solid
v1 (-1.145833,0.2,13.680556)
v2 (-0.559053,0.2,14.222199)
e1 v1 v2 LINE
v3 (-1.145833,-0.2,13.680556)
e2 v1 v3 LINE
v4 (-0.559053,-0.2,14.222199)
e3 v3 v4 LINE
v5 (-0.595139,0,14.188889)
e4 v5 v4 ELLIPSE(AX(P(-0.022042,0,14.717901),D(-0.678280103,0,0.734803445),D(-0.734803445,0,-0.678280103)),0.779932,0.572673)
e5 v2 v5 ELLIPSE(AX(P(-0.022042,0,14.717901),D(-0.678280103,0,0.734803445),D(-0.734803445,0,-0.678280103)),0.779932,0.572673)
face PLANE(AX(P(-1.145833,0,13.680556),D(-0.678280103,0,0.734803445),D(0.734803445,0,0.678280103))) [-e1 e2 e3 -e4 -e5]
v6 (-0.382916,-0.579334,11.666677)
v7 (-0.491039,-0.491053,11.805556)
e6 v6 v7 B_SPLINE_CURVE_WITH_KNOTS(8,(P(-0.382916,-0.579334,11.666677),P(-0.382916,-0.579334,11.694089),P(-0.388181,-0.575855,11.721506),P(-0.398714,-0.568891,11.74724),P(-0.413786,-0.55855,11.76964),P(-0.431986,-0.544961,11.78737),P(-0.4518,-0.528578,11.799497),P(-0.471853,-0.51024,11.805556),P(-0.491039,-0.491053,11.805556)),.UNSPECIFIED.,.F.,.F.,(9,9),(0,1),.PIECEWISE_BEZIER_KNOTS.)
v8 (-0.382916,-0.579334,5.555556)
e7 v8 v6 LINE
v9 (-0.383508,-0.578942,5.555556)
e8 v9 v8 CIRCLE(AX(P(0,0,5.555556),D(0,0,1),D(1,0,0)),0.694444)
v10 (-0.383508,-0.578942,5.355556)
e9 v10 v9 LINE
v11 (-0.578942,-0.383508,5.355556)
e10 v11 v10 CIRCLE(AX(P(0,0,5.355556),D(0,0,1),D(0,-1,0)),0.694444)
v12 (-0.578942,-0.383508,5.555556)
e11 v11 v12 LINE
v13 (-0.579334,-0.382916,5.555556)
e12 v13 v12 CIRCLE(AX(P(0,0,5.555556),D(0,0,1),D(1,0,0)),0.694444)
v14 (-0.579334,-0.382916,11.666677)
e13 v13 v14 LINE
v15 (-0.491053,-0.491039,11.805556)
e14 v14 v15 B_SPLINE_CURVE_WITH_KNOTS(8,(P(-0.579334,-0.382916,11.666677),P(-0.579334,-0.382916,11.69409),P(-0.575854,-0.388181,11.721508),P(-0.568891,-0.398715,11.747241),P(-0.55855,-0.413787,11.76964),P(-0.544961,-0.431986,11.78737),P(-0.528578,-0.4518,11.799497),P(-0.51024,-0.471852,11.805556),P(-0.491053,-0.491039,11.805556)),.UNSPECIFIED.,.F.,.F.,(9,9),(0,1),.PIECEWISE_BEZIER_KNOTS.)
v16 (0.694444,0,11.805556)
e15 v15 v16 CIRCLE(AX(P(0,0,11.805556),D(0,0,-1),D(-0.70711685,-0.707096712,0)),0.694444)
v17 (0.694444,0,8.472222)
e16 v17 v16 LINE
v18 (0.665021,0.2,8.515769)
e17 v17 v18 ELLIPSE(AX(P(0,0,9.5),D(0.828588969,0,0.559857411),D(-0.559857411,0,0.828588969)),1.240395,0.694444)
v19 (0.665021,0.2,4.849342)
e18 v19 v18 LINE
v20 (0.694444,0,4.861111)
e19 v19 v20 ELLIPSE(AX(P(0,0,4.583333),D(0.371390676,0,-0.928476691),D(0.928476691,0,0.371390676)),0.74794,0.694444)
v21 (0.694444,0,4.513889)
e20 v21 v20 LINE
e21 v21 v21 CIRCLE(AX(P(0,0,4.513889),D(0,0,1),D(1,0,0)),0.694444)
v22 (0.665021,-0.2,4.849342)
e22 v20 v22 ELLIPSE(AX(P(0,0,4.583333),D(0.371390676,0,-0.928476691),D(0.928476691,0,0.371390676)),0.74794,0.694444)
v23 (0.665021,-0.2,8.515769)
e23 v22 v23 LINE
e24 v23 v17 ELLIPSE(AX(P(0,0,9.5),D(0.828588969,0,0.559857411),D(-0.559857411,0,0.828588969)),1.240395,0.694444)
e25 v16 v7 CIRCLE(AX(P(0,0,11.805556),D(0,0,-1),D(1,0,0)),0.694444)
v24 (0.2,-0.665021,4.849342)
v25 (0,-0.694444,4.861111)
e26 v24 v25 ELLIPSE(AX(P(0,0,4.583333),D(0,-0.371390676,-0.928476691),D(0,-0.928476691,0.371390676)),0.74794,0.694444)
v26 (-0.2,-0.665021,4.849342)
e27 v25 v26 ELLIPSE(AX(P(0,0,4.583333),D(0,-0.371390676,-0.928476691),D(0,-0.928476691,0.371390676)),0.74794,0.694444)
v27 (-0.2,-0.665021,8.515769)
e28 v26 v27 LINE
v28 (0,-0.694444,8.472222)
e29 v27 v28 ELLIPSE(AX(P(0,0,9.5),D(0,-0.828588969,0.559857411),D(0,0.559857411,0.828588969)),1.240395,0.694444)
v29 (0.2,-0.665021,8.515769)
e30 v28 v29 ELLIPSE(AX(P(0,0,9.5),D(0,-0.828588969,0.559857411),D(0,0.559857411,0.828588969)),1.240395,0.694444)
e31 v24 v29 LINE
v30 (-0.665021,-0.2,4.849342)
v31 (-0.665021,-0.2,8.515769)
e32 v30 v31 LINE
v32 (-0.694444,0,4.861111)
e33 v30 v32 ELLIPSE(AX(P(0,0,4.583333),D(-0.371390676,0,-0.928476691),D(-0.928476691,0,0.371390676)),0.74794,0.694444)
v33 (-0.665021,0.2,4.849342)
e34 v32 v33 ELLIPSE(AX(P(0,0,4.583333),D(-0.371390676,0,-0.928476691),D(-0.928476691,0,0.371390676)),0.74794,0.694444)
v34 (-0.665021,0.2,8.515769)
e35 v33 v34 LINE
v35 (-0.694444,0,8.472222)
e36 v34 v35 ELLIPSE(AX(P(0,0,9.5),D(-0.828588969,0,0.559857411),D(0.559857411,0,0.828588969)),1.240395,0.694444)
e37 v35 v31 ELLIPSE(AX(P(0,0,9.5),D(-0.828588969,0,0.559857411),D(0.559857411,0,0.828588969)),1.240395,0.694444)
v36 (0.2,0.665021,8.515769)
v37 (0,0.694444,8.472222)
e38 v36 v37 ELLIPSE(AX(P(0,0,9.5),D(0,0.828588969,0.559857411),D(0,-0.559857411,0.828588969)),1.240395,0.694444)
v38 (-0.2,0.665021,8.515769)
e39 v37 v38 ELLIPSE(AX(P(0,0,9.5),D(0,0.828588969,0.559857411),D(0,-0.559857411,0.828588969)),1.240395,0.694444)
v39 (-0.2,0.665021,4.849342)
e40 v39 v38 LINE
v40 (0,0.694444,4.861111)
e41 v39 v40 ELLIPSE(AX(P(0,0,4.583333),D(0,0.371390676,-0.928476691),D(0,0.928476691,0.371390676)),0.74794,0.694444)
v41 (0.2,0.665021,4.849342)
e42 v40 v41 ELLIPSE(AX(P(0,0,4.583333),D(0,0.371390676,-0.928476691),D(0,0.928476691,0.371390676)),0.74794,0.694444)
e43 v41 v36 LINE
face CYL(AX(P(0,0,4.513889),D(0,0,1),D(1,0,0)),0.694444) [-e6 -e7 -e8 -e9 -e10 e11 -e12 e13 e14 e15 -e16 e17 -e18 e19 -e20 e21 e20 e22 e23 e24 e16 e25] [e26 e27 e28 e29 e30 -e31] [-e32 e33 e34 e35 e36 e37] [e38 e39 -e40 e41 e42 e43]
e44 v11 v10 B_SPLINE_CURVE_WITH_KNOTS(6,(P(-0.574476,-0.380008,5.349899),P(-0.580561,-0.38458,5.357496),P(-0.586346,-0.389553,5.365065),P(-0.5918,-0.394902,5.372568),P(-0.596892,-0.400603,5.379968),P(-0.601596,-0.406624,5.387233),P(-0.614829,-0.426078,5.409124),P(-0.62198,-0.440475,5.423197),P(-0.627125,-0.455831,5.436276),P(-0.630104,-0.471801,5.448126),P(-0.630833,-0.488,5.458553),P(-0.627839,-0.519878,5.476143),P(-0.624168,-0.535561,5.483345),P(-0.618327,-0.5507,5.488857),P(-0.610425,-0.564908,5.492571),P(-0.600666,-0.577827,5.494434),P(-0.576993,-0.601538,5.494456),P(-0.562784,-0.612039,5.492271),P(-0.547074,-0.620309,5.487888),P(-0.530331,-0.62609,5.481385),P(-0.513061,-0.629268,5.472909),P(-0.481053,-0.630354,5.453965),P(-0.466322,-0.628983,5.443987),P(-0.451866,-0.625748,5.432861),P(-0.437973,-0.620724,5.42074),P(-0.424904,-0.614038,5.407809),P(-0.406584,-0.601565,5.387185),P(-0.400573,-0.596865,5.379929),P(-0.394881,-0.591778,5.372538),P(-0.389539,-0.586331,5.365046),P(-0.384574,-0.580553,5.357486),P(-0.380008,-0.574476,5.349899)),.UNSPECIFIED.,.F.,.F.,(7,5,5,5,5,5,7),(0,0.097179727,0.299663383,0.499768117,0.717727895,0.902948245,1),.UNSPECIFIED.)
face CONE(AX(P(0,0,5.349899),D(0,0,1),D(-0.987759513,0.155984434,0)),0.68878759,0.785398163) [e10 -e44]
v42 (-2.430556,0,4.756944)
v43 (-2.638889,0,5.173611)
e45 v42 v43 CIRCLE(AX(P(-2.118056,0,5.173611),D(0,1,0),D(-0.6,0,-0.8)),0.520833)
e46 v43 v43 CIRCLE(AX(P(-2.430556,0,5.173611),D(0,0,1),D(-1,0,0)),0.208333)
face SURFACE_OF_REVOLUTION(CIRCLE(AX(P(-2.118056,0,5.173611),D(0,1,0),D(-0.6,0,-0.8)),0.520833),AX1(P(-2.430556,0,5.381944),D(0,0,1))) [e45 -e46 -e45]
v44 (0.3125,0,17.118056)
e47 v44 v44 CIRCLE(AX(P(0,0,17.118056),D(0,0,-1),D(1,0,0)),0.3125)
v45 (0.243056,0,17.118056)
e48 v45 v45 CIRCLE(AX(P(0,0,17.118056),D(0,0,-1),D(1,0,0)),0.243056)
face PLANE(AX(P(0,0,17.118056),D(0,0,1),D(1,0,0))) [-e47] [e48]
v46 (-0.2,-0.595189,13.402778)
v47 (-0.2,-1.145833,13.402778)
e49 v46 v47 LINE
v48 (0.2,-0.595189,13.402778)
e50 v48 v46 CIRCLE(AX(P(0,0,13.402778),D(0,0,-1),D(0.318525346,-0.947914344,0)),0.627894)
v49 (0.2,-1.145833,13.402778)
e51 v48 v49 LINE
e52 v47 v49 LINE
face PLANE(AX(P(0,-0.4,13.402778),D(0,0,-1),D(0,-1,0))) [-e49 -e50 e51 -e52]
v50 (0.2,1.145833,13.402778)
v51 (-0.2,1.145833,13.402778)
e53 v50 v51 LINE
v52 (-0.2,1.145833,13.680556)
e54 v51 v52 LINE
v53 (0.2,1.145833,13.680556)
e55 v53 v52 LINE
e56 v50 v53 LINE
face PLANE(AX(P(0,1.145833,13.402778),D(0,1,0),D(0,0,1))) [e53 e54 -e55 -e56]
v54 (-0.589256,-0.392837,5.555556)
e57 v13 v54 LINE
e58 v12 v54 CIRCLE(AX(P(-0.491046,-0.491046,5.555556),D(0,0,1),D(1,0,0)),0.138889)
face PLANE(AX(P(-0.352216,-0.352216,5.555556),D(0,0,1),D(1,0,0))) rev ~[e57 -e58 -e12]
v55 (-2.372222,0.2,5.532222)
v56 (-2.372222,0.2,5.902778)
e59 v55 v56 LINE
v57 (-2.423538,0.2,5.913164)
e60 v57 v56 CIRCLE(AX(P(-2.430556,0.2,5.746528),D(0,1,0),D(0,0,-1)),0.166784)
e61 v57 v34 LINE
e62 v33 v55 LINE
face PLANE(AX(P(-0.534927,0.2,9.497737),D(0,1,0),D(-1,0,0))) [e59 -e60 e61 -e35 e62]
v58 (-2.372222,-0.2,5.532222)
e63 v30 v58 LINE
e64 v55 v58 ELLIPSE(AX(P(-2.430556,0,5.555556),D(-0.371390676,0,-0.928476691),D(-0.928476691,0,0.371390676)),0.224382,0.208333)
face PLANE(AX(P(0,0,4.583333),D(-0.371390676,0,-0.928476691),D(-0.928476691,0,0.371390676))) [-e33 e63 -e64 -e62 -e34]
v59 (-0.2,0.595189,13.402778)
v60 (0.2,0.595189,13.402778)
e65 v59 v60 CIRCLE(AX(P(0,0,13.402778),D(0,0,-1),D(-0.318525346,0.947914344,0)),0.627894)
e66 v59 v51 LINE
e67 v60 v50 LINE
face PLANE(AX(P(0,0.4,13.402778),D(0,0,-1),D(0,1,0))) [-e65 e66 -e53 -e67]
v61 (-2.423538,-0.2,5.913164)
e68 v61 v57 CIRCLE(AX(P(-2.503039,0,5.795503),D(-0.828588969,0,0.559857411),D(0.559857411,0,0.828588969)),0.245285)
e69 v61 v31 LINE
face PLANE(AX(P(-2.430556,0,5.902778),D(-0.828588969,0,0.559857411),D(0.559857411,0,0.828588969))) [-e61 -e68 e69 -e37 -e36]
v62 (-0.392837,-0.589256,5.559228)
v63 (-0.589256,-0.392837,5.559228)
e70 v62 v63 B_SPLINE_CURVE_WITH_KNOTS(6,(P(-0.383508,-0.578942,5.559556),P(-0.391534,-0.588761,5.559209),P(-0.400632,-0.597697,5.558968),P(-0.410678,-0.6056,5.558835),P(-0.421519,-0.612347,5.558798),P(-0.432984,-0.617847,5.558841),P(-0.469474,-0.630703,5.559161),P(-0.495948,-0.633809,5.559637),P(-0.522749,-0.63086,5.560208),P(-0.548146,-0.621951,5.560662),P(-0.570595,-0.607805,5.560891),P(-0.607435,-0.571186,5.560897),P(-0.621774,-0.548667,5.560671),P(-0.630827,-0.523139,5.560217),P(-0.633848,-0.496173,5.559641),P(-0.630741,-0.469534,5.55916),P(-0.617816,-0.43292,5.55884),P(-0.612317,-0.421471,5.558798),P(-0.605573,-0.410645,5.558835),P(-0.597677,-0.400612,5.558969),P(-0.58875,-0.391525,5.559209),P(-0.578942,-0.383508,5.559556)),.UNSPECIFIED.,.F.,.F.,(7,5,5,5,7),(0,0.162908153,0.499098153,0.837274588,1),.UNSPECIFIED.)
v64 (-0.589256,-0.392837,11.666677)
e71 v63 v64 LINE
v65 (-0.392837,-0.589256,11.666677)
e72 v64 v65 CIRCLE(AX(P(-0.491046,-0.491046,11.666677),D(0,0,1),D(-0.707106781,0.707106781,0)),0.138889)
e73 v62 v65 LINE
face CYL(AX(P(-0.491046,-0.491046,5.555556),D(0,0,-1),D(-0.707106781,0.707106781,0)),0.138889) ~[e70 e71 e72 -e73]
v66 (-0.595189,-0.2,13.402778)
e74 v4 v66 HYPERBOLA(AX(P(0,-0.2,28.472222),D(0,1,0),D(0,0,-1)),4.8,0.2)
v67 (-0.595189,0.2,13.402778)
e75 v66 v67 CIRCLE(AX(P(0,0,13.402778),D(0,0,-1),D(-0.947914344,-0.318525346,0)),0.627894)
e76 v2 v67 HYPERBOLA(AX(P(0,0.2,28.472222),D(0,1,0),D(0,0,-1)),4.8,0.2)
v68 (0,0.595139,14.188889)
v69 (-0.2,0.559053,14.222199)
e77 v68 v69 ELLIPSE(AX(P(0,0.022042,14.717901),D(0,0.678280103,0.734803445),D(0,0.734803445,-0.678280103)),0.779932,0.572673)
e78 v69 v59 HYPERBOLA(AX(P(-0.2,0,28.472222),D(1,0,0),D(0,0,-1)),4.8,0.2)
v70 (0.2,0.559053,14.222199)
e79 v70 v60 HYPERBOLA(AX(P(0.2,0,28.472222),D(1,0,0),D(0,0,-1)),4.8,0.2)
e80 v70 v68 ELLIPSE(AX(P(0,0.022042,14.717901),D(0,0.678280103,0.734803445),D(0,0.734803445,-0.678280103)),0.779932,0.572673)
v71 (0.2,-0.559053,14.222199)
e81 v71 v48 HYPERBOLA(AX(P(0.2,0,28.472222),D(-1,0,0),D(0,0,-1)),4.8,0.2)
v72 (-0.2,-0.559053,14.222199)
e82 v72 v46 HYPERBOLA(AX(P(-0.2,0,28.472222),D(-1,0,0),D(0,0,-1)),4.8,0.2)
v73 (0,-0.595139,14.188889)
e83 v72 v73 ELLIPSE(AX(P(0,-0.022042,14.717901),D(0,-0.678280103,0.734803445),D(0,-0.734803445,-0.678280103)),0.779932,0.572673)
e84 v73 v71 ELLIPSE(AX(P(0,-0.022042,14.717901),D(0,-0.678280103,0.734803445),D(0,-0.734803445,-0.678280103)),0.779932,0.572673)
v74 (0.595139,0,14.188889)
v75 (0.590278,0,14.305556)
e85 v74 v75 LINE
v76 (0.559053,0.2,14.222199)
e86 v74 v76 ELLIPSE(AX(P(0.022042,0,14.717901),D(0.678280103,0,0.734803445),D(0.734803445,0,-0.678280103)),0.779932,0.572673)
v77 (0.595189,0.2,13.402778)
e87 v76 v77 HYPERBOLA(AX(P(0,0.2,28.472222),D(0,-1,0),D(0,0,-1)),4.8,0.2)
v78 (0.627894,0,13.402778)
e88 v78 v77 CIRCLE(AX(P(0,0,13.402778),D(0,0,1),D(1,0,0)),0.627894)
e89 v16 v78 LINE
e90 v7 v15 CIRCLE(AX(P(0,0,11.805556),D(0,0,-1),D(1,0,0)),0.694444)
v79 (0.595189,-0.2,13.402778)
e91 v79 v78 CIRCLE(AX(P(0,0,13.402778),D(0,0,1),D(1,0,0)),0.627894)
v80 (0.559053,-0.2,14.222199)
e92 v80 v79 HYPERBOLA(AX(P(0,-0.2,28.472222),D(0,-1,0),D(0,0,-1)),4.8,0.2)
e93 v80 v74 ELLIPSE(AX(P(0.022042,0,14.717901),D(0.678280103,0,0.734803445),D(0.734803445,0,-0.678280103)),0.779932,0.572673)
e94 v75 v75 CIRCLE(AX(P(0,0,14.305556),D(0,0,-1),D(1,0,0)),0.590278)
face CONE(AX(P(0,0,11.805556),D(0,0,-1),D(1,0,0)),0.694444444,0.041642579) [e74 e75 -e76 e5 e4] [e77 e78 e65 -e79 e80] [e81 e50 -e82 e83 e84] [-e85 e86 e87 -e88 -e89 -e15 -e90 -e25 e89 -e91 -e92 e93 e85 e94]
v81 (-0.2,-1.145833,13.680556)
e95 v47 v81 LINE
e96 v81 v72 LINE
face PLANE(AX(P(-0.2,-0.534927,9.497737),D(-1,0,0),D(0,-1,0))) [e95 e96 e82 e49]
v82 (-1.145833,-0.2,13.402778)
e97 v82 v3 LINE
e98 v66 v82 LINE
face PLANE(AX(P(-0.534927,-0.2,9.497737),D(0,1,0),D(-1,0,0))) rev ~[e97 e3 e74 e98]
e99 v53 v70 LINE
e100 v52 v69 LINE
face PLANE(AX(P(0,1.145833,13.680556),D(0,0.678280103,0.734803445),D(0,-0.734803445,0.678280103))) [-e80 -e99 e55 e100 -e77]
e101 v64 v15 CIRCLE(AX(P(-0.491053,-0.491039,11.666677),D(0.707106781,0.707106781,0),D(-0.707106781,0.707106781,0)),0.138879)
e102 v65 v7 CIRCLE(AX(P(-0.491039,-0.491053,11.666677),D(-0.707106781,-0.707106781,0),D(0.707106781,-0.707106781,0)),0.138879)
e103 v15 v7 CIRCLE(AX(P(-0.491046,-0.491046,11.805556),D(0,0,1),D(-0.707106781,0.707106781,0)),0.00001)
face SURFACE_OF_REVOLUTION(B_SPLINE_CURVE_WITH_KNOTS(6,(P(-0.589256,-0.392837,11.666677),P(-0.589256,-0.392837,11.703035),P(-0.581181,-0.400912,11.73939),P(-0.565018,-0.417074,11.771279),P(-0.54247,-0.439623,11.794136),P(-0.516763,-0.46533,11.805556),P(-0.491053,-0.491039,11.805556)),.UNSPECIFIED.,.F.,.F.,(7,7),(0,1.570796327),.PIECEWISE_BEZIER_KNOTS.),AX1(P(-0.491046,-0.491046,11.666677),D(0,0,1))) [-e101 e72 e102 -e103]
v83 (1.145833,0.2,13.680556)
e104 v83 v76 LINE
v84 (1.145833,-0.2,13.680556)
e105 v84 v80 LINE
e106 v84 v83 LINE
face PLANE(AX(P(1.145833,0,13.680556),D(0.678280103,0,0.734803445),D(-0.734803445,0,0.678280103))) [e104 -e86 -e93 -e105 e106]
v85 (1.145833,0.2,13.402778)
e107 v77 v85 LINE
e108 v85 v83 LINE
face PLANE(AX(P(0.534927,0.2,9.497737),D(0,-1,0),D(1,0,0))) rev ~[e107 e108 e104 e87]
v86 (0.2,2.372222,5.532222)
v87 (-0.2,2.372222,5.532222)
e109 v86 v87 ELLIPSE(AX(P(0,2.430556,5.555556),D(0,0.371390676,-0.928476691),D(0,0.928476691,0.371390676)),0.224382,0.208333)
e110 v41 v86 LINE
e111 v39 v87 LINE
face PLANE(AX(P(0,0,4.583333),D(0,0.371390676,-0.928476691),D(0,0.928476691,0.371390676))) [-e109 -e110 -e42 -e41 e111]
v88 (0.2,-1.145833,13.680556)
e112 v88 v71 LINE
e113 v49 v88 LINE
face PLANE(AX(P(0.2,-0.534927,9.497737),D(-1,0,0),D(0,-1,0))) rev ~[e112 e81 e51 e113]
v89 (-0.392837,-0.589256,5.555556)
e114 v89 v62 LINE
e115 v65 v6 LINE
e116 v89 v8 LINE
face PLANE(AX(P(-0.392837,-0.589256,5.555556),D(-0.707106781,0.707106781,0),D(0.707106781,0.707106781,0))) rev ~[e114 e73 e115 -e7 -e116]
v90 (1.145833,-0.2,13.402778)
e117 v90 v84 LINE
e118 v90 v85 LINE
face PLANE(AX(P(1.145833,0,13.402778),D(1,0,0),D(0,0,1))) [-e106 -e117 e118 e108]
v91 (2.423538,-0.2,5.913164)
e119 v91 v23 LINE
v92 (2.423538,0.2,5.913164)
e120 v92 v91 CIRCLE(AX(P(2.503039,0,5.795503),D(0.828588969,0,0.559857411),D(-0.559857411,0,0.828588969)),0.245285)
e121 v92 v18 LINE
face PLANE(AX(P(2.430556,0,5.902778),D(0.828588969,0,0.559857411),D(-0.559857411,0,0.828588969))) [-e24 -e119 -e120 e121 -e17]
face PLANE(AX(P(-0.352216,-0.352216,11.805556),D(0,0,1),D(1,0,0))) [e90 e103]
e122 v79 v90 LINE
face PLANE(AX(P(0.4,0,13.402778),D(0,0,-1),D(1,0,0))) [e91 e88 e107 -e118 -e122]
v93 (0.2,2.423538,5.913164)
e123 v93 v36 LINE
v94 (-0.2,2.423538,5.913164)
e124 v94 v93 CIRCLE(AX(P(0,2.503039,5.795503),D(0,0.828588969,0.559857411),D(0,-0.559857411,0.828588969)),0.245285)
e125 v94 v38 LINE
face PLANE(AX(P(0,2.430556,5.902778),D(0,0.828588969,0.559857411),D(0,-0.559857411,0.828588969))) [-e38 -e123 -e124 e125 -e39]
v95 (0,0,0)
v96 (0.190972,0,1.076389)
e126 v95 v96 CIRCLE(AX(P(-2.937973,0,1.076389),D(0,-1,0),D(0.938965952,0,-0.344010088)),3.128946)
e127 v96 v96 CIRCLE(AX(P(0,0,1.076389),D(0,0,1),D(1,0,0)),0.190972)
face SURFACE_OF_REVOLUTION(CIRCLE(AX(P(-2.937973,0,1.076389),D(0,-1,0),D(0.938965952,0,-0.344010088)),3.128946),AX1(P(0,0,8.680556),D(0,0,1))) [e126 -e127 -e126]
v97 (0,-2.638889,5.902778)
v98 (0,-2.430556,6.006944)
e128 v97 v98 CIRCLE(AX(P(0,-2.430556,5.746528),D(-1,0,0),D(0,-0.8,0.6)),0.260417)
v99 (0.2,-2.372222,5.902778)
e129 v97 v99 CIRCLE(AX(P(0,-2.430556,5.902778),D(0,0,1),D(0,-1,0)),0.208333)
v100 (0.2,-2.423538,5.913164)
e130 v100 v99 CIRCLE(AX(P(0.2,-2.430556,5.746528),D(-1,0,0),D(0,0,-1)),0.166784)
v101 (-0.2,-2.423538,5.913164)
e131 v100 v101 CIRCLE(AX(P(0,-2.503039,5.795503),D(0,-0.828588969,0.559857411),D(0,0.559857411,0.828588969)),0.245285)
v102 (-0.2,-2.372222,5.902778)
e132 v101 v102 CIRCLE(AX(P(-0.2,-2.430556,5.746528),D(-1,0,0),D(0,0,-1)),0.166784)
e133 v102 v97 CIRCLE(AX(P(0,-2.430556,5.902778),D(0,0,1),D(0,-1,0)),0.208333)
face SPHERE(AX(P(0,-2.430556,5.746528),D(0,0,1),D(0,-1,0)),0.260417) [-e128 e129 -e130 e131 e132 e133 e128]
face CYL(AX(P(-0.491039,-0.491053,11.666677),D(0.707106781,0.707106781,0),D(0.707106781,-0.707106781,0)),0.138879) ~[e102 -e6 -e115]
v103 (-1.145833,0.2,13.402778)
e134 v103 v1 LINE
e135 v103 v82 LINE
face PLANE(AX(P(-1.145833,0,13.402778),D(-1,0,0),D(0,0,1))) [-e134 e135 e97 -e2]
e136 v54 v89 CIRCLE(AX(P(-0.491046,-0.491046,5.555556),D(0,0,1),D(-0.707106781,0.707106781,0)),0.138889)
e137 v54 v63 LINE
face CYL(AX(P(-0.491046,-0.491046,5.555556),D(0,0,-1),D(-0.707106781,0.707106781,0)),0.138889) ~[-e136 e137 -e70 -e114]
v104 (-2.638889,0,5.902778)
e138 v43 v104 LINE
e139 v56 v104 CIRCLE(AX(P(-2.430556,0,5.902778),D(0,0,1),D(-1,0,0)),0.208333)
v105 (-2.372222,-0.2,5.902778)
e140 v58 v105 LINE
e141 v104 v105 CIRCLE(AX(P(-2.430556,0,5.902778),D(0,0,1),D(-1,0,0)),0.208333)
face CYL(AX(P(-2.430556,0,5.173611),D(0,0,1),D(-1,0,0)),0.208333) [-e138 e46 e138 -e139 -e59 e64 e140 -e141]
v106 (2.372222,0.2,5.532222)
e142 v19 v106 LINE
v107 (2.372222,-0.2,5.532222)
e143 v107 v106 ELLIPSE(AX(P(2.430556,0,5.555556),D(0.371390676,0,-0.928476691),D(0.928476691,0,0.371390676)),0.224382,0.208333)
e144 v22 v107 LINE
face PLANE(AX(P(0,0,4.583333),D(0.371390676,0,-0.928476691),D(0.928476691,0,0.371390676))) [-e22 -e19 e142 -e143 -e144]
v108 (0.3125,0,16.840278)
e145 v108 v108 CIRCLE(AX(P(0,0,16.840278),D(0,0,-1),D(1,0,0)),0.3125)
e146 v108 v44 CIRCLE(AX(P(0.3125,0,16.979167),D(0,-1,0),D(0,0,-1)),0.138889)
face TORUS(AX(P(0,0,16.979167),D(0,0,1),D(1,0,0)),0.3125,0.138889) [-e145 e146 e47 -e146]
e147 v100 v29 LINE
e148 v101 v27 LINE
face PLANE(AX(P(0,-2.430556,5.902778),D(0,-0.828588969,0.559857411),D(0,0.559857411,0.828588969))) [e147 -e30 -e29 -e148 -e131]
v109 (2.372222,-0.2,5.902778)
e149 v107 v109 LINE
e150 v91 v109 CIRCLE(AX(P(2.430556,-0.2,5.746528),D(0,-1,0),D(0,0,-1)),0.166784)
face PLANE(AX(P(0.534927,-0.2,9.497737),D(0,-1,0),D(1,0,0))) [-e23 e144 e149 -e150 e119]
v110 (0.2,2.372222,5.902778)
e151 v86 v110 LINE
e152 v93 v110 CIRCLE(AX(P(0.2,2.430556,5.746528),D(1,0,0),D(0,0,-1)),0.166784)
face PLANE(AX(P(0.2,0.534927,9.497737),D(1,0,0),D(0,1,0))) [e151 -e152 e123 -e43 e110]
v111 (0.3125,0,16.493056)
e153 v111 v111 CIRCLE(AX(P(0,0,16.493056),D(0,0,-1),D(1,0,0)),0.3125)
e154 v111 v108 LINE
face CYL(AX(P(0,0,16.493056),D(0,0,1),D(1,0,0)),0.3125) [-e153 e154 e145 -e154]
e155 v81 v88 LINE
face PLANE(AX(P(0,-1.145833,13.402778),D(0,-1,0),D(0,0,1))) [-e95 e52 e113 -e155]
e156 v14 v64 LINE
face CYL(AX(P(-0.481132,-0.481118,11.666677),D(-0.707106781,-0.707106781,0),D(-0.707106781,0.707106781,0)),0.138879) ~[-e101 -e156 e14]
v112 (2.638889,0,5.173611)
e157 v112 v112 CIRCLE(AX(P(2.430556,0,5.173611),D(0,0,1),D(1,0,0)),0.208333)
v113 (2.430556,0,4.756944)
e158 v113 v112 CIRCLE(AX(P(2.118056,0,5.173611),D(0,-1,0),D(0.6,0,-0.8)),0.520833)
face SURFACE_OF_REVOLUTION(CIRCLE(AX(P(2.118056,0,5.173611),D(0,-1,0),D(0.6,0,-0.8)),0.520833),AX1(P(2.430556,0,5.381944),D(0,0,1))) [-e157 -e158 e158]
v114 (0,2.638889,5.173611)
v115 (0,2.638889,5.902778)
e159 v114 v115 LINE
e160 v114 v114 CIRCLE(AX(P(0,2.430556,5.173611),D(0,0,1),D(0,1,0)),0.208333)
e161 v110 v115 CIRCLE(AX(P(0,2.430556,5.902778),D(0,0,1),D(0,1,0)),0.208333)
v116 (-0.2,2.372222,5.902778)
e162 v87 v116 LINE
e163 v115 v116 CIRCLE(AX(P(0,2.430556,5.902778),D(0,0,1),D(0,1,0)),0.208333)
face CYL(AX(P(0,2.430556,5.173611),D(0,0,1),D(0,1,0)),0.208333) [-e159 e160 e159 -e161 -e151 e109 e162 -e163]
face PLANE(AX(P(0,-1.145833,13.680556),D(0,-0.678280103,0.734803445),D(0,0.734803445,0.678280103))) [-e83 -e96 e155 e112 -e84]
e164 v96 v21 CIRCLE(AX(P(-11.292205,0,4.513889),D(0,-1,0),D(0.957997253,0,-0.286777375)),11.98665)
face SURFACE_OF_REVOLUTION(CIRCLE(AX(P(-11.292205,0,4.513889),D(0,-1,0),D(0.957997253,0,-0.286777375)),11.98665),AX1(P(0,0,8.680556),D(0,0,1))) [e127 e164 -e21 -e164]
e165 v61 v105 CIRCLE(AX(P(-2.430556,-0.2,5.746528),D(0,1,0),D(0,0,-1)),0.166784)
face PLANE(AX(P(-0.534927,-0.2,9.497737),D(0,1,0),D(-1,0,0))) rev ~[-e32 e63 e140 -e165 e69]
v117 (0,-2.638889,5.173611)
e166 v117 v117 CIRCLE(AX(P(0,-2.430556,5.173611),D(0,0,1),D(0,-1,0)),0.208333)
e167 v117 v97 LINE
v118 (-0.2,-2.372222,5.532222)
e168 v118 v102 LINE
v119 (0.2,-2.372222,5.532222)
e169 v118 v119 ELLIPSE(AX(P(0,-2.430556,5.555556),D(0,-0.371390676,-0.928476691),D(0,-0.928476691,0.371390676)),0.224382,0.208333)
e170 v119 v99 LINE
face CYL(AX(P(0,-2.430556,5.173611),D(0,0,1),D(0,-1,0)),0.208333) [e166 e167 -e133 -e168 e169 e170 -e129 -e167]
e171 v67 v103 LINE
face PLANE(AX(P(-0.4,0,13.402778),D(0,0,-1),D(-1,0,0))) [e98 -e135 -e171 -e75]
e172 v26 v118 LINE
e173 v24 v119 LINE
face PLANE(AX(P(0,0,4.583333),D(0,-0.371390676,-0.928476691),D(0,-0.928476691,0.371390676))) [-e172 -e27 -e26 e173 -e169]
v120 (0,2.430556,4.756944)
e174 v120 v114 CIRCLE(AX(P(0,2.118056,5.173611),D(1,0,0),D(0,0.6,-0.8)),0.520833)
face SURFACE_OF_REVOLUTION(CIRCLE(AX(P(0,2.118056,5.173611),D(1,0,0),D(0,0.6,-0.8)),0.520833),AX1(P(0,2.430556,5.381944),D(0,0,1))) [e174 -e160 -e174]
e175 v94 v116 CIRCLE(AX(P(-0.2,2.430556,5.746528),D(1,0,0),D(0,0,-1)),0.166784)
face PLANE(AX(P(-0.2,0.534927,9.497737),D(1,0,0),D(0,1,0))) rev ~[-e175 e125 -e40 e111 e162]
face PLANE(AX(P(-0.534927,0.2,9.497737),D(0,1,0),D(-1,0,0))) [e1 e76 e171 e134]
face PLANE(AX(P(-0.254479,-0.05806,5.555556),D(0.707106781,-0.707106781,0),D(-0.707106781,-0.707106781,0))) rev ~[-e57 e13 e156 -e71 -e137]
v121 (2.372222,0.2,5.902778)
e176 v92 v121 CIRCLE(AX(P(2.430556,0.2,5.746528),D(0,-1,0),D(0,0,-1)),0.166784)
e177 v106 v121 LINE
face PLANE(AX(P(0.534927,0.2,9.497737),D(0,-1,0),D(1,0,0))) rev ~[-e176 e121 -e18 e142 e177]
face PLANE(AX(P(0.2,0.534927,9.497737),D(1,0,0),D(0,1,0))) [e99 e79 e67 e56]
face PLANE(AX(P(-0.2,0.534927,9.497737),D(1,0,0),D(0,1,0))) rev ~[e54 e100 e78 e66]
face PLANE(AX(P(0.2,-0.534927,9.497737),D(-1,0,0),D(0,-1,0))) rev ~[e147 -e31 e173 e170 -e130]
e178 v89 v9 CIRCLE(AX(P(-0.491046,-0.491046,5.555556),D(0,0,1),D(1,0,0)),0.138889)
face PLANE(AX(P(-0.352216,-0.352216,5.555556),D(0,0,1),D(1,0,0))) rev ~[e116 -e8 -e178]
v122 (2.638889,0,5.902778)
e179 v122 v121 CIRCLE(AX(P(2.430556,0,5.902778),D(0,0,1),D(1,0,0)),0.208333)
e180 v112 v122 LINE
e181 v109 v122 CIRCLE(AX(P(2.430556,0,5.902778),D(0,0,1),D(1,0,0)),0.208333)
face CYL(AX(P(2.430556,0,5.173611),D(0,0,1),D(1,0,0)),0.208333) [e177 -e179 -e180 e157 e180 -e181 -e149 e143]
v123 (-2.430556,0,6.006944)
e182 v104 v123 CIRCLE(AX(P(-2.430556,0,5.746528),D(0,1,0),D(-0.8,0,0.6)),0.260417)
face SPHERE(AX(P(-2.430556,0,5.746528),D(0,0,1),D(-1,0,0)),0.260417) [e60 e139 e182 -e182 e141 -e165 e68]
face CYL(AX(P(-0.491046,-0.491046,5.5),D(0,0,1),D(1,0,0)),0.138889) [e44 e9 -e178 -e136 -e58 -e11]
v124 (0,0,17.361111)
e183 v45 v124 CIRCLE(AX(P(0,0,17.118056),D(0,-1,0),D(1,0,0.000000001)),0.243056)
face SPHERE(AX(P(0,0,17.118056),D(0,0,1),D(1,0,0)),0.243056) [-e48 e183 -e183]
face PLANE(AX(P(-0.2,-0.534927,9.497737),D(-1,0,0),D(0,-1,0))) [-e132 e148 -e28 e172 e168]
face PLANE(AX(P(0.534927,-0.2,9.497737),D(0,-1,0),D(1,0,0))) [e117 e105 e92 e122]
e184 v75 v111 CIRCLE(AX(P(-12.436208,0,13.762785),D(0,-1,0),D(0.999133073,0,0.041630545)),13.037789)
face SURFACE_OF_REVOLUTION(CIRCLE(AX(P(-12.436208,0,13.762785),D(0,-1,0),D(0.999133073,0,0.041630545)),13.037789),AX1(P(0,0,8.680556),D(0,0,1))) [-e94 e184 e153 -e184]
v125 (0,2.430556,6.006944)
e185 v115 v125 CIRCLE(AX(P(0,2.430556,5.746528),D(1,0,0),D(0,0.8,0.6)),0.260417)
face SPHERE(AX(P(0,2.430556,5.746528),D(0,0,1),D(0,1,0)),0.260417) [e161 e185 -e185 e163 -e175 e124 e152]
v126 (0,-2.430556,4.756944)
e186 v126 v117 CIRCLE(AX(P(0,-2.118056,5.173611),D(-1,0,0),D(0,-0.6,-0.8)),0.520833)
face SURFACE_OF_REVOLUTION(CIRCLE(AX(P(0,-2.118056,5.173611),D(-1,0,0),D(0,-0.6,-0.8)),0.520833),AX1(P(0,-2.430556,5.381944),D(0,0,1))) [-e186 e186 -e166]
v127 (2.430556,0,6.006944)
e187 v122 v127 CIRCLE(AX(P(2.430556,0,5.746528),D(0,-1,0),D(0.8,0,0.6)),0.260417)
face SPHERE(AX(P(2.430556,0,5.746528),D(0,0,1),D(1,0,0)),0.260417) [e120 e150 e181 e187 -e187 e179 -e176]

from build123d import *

# Parameters (mm, degrees)
F4_DEPTH     = 0.2
F7_COUNT     = 4
F10_DEPTH    = 6.25
F11_T4_ANGLE = 107.9477893391
F11_S5_R     = 0.1388888889
F11_T6_DEPTH = 2
F12_R        = 0.138879


# Not quite as in the source:
# - a fillet or chamfer that OpenCascade refuses, or shapes differently, is made with other operations: its cross-section is extruded or revolved along the edge and cut away or added
# - a fillet or chamfer is up to 0.001 mm smaller than in the source, because OpenCascade refuses the exact size
# - a feature names something its author has since deleted; it is built from what else it names


with BuildPart() as f2:
    # F1 (on Front) → F2 (revolve)
    with BuildSketch(Plane.XZ):
        with BuildLine():
            Line((0, 17.3611111111), (0, 0))
            ThreePointArc((0, 0), (0.1428592565, 0.5297895315), (0.1909722222, 1.0763888889))
            ThreePointArc((0.1909722222, 1.0763888889), (0.5679085065, 2.7768014898), (0.6944444444, 4.5138888889))
            Line((0.6944444444, 4.5138888889), (0.6944444444, 11.8055555556))
            Line((0.6944444444, 11.8055555556), (0.5902777778, 14.3055555556))
            ThreePointArc((0.5902777778, 14.3055555556), (0.4977180332, 15.4051886215), (0.3125, 16.4930555556))
            Line((0.3125, 16.4930555556), (0.3125, 16.8402777778))
            ThreePointArc((0.3125, 16.8402777778), (0.4513888889, 16.9791666667), (0.3125, 17.1180555556))
            Line((0.3125, 17.1180555556), (0.2430555556, 17.1180555556))
            ThreePointArc((0.2430555556, 17.1180555556), (0.1718662315, 17.2899217871), (0, 17.3611111111))
        make_face()
    revolve(axis=Axis((0, 0, 8.6805555556), (0, 0, 1)))

    # F3 (on Front) → F4 (join, symmetric)
    with BuildSketch(Plane.XZ):
        Polygon((0, 14.7382478632), (0, 4.5833333333), (2.4305555556, 5.5555555556), (2.4305555556, 5.9027777778), (0.4, 8.908), (0.4, 13.4027777778), (1.1458333333, 13.4027777778), (1.1458333333, 13.6805555556), align=None)
    extrude(amount=F4_DEPTH, both=True)

    # F5 (on Front) → F6 (revolve)
    with BuildSketch(Plane.XZ):
        with BuildLine():
            Line((2.4305555556, 5.9027777778), (2.4305555556, 4.7569444444))
            ThreePointArc((2.4305555556, 4.7569444444), (2.5839030509, 4.9406873635), (2.6388888889, 5.1736111111))
            Line((2.6388888889, 5.1736111111), (2.6388888889, 5.9027777778))
            ThreePointArc((2.6388888889, 5.9027777778), (2.5470174294, 5.9794515254), (2.4305555556, 6.0069444444))
            Line((2.4305555556, 6.0069444444), (2.4305555556, 5.9027777778))
        make_face()
    revolve(axis=Axis((2.4305555556, 0, 5.3819444444), (0, 0, 1)))

    # F7: F2 ×4 about axis
    f7_axis = Axis((0, 0, 4.5138888889), (0, 0, 1))


with BuildPart() as f2_1:
    add(f2.part)
    for i in range(1, F7_COUNT):
        add(f2.part.rotate(f7_axis, i * 360 / F7_COUNT))

    # F9 (on offset) → F10 (join)
    with BuildSketch(Plane.XY.offset(5.5555555556)):
        with BuildLine():
            Line((-0.3928371007, -0.589255651), (-0.0580600084, -0.2544785587))
            Line((-0.0580600084, -0.2544785587), (-0.2544785587, -0.0580600084))
            Line((-0.2544785587, -0.0580600084), (-0.589255651, -0.3928371007))
            ThreePointArc((-0.589255651, -0.3928371007), (-0.589255651, -0.589255651), (-0.3928371007, -0.589255651))
        make_face()
    extrude(amount=F10_DEPTH)

    # F11: chamfer of 0.2 on 1 edges, made by hand


with BuildPart() as f11_tool2:
    # F11_s3 → F11_t4 (revolve)
    with BuildSketch(Plane(origin=(0, 0, 0), x_dir=(0, 0, 1), z_dir=(0.1559844343, 0.9877595134, 0))):
        with BuildLine():
            Line((5.3498987013, -0.6887875902), (5.5612124098, -0.9001012987))
            Line((5.5612124098, -0.9001012987), (5.5652124098, -0.9001012987))
            ThreePointArc((5.5652124098, -0.9001012987), (5.5595555556, -0.7972728716), (5.5595555556, -0.6944444444))
            Line((5.5595555556, -0.6944444444), (5.5555555556, -0.6904444444))
            ThreePointArc((5.5555555556, -0.6904444444), (5.4527271284, -0.6904444444), (5.3498987013, -0.6847875902))
            Line((5.3498987013, -0.6847875902), (5.3498987013, -0.6887875902))
        make_face()
    revolve(axis=Axis((0, 0, 5.5555555556), (0, 0, 1)), revolution_arc=F11_T4_ANGLE)

    # F11_s5 → F11_t6 (intersect, symmetric)
    with BuildSketch(Plane.XY.offset(5.5)):
        with Locations((-0.4910463758, -0.4910463758)):
            Circle(F11_S5_R)
    extrude(amount=F11_T6_DEPTH, both=True, mode=Mode.INTERSECT)


with BuildPart() as f2_2:
    add(f2_1.part)

    # F11_t1: union F11_tool2
    add(f11_tool2.part)

    # F12 (radius 0.1388888889 in the source; OpenCascade refuses exactly that, so slightly less here)
    f12_edges = [f2_2.edges().sort_by_distance(p)[0] for p in [
        (-0.589256, -0.589256, 11.805556),
    ]]
    fillet(f12_edges, radius=F12_R)


solid = f2_2.part
